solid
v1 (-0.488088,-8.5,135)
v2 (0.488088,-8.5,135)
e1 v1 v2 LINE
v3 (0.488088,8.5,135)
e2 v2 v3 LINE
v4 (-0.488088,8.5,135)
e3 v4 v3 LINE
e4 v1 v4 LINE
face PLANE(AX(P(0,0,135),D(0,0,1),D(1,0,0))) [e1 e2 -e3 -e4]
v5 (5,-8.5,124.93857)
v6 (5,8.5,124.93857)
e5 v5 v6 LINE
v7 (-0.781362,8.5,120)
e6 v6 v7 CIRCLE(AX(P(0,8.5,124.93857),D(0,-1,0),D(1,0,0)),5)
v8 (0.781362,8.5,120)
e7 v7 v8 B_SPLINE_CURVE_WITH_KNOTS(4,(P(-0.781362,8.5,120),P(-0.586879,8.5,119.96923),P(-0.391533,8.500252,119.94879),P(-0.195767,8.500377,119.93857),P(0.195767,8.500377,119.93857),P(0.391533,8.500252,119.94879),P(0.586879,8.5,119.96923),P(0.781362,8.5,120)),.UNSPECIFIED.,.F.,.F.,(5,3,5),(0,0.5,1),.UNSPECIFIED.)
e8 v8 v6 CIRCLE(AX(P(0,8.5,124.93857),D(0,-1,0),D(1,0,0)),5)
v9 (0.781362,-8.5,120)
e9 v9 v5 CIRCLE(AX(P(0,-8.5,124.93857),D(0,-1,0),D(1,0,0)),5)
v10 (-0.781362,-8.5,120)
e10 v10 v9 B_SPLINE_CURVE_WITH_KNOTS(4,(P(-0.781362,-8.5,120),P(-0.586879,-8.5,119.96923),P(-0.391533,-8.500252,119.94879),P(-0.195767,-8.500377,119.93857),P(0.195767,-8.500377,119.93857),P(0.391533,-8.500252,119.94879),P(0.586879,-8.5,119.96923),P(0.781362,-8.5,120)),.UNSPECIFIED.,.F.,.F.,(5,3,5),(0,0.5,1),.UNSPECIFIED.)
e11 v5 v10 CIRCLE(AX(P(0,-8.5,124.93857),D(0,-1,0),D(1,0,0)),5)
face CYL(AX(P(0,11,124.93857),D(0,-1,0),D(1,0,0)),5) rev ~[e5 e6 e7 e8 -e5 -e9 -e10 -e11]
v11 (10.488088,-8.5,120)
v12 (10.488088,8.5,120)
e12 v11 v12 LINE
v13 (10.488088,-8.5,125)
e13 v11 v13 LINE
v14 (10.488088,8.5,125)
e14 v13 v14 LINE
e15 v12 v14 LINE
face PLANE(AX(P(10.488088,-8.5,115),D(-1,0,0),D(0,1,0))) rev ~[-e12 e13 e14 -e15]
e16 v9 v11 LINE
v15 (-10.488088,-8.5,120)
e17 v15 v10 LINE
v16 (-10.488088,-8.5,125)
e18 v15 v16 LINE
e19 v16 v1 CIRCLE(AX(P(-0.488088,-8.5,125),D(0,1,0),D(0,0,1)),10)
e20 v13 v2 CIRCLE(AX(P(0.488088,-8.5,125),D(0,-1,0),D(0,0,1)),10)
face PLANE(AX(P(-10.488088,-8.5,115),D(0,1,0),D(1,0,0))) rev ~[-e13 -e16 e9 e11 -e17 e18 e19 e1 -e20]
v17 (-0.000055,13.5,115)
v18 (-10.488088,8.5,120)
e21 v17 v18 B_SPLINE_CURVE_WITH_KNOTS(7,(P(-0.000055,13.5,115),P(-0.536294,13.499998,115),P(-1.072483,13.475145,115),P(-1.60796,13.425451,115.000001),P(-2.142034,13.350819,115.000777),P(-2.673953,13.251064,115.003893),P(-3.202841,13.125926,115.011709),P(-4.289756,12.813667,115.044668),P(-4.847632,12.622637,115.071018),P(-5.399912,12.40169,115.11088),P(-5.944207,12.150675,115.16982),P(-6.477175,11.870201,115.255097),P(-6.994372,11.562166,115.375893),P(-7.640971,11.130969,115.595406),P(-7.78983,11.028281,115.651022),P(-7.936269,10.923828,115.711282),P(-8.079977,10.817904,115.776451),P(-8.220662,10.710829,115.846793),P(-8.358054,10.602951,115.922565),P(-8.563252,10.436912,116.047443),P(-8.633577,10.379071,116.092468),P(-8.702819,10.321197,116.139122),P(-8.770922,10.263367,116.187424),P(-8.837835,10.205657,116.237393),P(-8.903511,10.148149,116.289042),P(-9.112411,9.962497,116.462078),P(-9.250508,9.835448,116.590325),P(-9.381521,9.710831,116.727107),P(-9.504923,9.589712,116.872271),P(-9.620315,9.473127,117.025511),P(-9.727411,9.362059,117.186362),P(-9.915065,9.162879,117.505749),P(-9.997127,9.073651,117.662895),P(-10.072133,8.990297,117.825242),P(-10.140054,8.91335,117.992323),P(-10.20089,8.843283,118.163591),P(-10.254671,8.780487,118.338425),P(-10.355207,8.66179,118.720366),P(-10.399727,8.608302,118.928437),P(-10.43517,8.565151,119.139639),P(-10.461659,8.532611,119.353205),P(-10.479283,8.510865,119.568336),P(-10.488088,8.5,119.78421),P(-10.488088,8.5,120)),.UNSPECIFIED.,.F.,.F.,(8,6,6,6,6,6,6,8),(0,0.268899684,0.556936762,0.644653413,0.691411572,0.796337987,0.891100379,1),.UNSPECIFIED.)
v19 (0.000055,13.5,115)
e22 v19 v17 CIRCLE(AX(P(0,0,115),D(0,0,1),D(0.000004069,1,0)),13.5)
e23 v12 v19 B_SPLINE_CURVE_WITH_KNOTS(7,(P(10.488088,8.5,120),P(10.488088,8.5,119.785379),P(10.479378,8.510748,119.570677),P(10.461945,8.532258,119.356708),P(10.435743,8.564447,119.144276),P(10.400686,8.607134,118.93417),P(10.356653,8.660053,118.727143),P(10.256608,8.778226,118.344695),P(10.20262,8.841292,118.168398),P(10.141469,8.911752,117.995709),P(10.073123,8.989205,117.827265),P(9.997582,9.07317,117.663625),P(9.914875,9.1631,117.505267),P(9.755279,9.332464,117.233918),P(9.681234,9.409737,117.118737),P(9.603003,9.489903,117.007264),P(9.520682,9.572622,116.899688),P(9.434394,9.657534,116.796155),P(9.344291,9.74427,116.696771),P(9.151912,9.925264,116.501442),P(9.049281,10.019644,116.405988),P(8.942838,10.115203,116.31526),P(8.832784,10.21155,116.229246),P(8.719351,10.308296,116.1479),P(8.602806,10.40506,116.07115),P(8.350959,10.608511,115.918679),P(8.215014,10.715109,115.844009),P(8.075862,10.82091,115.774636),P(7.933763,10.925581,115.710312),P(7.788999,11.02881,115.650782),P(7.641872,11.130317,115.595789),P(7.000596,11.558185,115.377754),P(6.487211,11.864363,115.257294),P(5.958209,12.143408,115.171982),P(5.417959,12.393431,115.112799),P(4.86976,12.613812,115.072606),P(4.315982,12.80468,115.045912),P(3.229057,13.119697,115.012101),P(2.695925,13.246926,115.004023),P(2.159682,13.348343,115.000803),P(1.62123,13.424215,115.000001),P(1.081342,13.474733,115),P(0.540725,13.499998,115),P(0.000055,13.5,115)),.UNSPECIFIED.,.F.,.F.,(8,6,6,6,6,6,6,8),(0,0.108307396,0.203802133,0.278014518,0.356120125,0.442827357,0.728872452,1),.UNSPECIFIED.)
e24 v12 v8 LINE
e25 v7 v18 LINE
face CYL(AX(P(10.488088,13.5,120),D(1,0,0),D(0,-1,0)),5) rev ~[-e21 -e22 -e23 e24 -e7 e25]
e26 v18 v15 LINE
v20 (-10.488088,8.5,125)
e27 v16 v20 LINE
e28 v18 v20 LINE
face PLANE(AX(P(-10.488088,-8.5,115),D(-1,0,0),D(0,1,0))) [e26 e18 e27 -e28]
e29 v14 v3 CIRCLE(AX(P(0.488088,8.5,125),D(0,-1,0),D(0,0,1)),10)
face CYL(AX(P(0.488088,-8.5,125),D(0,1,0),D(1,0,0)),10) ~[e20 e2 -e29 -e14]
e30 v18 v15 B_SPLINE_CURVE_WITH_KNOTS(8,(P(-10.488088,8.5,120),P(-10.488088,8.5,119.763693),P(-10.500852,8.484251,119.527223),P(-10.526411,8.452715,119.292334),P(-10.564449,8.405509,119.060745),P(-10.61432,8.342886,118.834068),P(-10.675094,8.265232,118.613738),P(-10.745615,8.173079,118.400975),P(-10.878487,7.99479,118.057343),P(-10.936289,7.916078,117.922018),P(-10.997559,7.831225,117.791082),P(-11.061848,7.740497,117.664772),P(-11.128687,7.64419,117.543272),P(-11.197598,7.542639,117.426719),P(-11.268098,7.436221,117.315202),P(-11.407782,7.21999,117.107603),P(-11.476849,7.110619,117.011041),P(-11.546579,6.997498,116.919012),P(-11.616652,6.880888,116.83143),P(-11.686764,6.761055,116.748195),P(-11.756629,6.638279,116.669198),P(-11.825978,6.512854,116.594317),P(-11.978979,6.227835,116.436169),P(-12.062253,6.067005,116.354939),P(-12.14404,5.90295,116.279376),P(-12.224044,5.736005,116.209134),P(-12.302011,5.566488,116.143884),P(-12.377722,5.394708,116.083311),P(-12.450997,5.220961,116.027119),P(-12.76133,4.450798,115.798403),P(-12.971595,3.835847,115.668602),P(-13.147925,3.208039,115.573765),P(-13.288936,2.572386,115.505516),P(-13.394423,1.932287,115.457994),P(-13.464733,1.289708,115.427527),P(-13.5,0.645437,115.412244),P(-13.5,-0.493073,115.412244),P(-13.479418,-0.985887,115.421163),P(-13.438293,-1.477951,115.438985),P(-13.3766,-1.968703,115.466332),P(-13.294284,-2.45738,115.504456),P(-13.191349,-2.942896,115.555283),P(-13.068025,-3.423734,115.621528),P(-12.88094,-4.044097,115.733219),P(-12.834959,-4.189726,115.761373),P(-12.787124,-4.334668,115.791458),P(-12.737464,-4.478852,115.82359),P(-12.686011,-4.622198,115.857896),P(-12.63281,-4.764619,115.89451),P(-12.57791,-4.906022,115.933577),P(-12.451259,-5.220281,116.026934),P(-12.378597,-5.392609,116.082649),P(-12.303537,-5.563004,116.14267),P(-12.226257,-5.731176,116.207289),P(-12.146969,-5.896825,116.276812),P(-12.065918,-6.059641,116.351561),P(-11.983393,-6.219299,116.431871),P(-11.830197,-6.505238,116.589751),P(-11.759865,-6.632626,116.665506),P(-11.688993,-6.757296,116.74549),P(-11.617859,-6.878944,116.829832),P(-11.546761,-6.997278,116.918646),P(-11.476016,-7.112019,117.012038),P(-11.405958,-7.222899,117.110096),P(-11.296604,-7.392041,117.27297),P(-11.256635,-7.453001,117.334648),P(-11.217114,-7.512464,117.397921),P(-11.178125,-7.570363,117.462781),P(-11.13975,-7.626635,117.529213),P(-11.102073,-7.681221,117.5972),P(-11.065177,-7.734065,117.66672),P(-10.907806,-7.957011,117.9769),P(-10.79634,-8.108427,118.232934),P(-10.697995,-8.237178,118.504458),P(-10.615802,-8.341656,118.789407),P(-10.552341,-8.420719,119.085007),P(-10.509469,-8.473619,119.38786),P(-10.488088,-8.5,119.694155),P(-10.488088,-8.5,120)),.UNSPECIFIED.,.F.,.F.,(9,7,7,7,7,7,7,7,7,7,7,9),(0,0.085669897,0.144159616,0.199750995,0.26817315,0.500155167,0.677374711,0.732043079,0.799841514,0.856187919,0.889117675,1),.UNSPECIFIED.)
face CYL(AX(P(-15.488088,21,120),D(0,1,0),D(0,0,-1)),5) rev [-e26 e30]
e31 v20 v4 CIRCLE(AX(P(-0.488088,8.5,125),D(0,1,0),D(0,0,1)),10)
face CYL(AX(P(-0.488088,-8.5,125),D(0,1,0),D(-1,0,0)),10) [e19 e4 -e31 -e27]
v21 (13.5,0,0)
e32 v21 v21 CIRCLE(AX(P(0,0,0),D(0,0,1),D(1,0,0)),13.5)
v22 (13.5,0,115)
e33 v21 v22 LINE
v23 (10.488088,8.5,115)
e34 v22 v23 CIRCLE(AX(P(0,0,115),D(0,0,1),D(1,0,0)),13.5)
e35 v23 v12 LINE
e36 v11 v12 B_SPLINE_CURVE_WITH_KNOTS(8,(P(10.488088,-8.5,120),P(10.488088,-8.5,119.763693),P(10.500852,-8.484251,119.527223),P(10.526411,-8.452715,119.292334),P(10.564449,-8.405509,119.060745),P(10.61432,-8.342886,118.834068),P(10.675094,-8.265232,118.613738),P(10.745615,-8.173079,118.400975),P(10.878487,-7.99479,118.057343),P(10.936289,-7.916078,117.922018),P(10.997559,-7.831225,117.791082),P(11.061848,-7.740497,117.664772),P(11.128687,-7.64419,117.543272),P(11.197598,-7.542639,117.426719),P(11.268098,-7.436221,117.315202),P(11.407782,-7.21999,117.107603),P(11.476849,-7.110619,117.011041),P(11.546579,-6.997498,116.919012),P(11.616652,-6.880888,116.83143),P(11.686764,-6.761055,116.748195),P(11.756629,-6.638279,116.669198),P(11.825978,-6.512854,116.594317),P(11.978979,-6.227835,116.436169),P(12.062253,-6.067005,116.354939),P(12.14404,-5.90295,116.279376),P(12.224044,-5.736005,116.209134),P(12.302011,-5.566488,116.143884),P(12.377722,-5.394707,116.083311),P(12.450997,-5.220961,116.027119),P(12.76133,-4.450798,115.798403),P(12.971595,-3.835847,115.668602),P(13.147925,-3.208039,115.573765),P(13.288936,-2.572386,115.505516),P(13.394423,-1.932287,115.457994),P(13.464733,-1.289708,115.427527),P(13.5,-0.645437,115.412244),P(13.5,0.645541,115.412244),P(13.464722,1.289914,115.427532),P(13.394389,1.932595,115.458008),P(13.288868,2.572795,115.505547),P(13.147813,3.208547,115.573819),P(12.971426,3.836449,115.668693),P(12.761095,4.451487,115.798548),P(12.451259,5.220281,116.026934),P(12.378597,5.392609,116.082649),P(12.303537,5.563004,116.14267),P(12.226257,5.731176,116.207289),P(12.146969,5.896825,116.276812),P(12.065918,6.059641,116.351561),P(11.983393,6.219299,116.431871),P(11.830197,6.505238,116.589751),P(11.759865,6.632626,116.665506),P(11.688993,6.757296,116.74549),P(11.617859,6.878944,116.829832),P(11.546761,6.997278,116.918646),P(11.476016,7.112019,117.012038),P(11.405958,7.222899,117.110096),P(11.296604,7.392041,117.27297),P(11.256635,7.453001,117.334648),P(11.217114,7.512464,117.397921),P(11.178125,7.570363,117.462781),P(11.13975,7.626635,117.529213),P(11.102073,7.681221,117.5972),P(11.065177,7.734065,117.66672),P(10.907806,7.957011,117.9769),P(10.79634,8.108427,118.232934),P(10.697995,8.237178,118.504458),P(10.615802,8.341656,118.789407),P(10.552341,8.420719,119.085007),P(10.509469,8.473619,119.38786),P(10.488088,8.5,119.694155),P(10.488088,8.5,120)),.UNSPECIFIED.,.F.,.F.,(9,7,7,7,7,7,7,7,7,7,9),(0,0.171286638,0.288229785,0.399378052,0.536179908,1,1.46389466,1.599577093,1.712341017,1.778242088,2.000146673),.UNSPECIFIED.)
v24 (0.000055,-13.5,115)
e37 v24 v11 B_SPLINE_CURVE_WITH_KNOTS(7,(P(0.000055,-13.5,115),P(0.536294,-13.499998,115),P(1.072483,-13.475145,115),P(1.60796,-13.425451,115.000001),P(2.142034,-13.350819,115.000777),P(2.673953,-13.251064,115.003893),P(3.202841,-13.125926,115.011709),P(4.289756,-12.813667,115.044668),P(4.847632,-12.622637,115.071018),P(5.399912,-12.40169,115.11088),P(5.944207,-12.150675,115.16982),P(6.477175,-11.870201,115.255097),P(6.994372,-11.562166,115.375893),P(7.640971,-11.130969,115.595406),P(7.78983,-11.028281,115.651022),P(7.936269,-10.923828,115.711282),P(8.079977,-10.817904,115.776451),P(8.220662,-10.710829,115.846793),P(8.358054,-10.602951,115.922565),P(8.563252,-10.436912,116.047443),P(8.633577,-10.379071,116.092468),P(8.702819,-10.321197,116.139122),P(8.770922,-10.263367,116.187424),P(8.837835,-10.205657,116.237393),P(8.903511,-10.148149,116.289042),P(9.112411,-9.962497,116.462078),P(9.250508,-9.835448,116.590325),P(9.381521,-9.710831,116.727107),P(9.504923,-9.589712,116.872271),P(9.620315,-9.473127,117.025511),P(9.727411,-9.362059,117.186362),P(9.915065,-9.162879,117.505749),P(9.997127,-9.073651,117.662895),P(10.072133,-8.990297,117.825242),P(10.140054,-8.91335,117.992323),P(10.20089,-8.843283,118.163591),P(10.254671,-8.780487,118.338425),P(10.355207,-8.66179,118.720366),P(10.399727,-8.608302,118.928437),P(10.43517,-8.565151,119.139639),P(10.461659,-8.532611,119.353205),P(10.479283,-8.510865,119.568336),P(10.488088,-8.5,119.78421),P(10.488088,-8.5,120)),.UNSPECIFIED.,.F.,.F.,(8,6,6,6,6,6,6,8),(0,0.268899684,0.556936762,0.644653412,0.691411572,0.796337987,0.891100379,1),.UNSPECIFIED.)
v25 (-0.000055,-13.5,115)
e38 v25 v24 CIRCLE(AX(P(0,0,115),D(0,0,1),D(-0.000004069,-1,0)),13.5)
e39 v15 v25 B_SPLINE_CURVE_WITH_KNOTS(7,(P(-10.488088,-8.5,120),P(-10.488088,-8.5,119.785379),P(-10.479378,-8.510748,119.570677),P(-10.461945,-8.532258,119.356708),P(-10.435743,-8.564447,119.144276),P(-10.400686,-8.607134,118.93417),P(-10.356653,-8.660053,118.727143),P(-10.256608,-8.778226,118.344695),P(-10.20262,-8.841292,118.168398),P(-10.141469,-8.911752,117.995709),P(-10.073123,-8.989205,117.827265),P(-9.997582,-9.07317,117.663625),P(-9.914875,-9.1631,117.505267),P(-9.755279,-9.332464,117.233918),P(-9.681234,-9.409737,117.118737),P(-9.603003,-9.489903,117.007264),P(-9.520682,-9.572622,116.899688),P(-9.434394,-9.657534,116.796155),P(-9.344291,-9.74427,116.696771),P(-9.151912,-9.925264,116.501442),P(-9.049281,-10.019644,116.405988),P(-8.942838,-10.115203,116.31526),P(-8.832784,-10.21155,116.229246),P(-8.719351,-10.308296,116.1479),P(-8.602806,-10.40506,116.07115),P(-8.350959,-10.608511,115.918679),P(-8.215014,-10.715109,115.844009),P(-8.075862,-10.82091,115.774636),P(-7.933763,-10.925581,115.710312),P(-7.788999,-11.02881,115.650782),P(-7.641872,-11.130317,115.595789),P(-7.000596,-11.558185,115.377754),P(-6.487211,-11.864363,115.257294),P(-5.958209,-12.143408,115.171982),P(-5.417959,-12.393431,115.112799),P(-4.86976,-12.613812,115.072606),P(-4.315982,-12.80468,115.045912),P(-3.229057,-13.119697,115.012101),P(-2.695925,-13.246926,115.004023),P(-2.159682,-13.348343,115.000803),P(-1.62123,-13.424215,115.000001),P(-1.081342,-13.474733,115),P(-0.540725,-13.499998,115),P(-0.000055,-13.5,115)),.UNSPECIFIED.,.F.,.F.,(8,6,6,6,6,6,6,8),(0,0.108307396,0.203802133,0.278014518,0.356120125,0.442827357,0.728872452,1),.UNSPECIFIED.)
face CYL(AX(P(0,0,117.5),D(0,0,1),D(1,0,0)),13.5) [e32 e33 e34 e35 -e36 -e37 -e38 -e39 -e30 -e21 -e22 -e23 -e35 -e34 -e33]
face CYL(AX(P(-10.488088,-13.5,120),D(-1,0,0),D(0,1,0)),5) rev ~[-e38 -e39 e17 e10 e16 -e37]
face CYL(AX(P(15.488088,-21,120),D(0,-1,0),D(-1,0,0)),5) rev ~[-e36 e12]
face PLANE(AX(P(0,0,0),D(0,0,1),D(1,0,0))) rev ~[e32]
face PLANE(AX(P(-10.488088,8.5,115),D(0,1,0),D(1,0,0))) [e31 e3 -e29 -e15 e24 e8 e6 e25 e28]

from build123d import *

# Parameters (mm, degrees)
F0_R         = 13.5
F1_DEPTH     = 115
F2_W         = 20.9761769634
F2_H         = 17
F3_DEPTH     = 20
F4_R         = 5
F5_DEPTH     = 25
F6_R         = 10
F7_T4_DEPTH  = 20.9761769634
F7_S5_R      = 5
F7_T6_DEPTH  = 13
F7_S7_R      = 13.5
F7_T8_DEPTH  = 13
F7_T12_DEPTH = 20.9761769634
F7_S13_R     = 13.5
F7_T14_DEPTH = 13
F7_S15_R     = 5
F7_T16_DEPTH = 13
F8_T4_DEPTH  = 42
F8_S5_R      = 13.5
F8_T6_DEPTH  = 23
F8_T10_DEPTH = 42
F8_S11_R     = 13.5
F8_T12_DEPTH = 23


# Not quite as in the source:
# - a fillet or chamfer that OpenCascade refuses, or shapes differently, is made with other operations: its cross-section is extruded or revolved along the edge and cut away or added


with BuildPart() as f1:
    # F0 (on Top) → F1 (new body)
    with BuildSketch(Plane.XY):
        Circle(F0_R)
    extrude(amount=F1_DEPTH)

    # F2 (on face) → F3 (join)
    with BuildSketch(Plane.XY.offset(115)):
        Rectangle(F2_W, F2_H)
    extrude(amount=F3_DEPTH)

    # F4 (on face) → F5 (cut)
    with BuildSketch(Plane.XZ.offset(8.5)):
        with Locations((0, 124.938569963)):
            Circle(F4_R)
    extrude(amount=-F5_DEPTH, mode=Mode.SUBTRACT)

    # F6
    f6_edges = [f1.edges().sort_by_distance(p)[0] for p in [
        (10.488088, 0, 135),
        (-10.488088, 0, 135),
    ]]
    fillet(f6_edges, radius=F6_R)

    # F7: fillet of radius 5 on 2 edges, made by hand


with BuildPart() as f7_tool2:
    # F7_s3 → F7_t4 (new body)
    with BuildSketch(Plane.YZ.offset(-10.4880884817)):
        with BuildLine():
            ThreePointArc((-8.5, 120), (-9.9644660941, 116.4644660941), (-13.5, 115))
            Line((-13.5, 115), (-8.5, 115))
            Line((-8.5, 115), (-8.5, 120))
        make_face()
    extrude(amount=F7_T4_DEPTH)

    # F7_s5 → F7_t6 (cut, symmetric)
    with BuildSketch(Plane.XZ.offset(11)):
        with Locations((0, 124.938569963)):
            Circle(F7_S5_R)
    extrude(amount=F7_T6_DEPTH, both=True, mode=Mode.SUBTRACT)

    # F7_s7 → F7_t8 (intersect, symmetric)
    with BuildSketch(Plane.XY.offset(117.5)):
        Circle(F7_S7_R)
    extrude(amount=F7_T8_DEPTH, both=True, mode=Mode.INTERSECT)


with BuildPart() as f1_1:
    add(f1.part)

    # F7_t1: union F7_tool2
    add(f7_tool2.part)


with BuildPart() as f7_tool10:
    # F7_s11 → F7_t12 (new body)
    with BuildSketch(Plane.YZ.offset(10.4880884817)):
        with BuildLine():
            ThreePointArc((8.5, 120), (9.9644660941, 116.4644660941), (13.5, 115))
            Line((13.5, 115), (8.5, 115))
            Line((8.5, 115), (8.5, 120))
        make_face()
    extrude(amount=-F7_T12_DEPTH)

    # F7_s13 → F7_t14 (intersect, symmetric)
    with BuildSketch(Plane.XY.offset(117.5)):
        Circle(F7_S13_R)
    extrude(amount=F7_T14_DEPTH, both=True, mode=Mode.INTERSECT)

    # F7_s15 → F7_t16 (cut, symmetric)
    with BuildSketch(Plane.XZ.offset(-11)):
        with Locations((0, 124.938569963)):
            Circle(F7_S15_R)
    extrude(amount=F7_T16_DEPTH, both=True, mode=Mode.SUBTRACT)


with BuildPart() as f1_2:
    add(f1_1.part)

    # F7_t9: union F7_tool10
    add(f7_tool10.part)

    # F8: fillet of radius 5 on 2 edges, made by hand


with BuildPart() as f8_tool2:
    # F8_s3 → F8_t4 (new body)
    with BuildSketch(Plane.XZ.offset(21)):
        with BuildLine():
            ThreePointArc((10.4880884817, 120), (11.9525545758, 116.4644660941), (15.4880884817, 115))
            Line((15.4880884817, 115), (10.4880884817, 115))
            Line((10.4880884817, 115), (10.4880884817, 120))
        make_face()
    extrude(amount=-F8_T4_DEPTH)

    # F8_s5 → F8_t6 (intersect, symmetric)
    with BuildSketch(Plane.XY.offset(117.5)):
        Circle(F8_S5_R)
    extrude(amount=F8_T6_DEPTH, both=True, mode=Mode.INTERSECT)


with BuildPart() as f1_3:
    add(f1_2.part)

    # F8_t1: union F8_tool2
    add(f8_tool2.part)


with BuildPart() as f8_tool8:
    # F8_s9 → F8_t10 (new body)
    with BuildSketch(Plane.XZ.offset(-21)):
        with BuildLine():
            ThreePointArc((-15.4880884817, 115), (-11.9525545758, 116.4644660941), (-10.4880884817, 120))
            Line((-10.4880884817, 120), (-10.4880884817, 115))
            Line((-10.4880884817, 115), (-15.4880884817, 115))
        make_face()
    extrude(amount=F8_T10_DEPTH)

    # F8_s11 → F8_t12 (intersect, symmetric)
    with BuildSketch(Plane.XY.offset(117.5)):
        Circle(F8_S11_R)
    extrude(amount=F8_T12_DEPTH, both=True, mode=Mode.INTERSECT)


with BuildPart() as f1_4:
    add(f1_3.part)

    # F8_t7: union F8_tool8
    add(f8_tool8.part)


solid = f1_4.part
